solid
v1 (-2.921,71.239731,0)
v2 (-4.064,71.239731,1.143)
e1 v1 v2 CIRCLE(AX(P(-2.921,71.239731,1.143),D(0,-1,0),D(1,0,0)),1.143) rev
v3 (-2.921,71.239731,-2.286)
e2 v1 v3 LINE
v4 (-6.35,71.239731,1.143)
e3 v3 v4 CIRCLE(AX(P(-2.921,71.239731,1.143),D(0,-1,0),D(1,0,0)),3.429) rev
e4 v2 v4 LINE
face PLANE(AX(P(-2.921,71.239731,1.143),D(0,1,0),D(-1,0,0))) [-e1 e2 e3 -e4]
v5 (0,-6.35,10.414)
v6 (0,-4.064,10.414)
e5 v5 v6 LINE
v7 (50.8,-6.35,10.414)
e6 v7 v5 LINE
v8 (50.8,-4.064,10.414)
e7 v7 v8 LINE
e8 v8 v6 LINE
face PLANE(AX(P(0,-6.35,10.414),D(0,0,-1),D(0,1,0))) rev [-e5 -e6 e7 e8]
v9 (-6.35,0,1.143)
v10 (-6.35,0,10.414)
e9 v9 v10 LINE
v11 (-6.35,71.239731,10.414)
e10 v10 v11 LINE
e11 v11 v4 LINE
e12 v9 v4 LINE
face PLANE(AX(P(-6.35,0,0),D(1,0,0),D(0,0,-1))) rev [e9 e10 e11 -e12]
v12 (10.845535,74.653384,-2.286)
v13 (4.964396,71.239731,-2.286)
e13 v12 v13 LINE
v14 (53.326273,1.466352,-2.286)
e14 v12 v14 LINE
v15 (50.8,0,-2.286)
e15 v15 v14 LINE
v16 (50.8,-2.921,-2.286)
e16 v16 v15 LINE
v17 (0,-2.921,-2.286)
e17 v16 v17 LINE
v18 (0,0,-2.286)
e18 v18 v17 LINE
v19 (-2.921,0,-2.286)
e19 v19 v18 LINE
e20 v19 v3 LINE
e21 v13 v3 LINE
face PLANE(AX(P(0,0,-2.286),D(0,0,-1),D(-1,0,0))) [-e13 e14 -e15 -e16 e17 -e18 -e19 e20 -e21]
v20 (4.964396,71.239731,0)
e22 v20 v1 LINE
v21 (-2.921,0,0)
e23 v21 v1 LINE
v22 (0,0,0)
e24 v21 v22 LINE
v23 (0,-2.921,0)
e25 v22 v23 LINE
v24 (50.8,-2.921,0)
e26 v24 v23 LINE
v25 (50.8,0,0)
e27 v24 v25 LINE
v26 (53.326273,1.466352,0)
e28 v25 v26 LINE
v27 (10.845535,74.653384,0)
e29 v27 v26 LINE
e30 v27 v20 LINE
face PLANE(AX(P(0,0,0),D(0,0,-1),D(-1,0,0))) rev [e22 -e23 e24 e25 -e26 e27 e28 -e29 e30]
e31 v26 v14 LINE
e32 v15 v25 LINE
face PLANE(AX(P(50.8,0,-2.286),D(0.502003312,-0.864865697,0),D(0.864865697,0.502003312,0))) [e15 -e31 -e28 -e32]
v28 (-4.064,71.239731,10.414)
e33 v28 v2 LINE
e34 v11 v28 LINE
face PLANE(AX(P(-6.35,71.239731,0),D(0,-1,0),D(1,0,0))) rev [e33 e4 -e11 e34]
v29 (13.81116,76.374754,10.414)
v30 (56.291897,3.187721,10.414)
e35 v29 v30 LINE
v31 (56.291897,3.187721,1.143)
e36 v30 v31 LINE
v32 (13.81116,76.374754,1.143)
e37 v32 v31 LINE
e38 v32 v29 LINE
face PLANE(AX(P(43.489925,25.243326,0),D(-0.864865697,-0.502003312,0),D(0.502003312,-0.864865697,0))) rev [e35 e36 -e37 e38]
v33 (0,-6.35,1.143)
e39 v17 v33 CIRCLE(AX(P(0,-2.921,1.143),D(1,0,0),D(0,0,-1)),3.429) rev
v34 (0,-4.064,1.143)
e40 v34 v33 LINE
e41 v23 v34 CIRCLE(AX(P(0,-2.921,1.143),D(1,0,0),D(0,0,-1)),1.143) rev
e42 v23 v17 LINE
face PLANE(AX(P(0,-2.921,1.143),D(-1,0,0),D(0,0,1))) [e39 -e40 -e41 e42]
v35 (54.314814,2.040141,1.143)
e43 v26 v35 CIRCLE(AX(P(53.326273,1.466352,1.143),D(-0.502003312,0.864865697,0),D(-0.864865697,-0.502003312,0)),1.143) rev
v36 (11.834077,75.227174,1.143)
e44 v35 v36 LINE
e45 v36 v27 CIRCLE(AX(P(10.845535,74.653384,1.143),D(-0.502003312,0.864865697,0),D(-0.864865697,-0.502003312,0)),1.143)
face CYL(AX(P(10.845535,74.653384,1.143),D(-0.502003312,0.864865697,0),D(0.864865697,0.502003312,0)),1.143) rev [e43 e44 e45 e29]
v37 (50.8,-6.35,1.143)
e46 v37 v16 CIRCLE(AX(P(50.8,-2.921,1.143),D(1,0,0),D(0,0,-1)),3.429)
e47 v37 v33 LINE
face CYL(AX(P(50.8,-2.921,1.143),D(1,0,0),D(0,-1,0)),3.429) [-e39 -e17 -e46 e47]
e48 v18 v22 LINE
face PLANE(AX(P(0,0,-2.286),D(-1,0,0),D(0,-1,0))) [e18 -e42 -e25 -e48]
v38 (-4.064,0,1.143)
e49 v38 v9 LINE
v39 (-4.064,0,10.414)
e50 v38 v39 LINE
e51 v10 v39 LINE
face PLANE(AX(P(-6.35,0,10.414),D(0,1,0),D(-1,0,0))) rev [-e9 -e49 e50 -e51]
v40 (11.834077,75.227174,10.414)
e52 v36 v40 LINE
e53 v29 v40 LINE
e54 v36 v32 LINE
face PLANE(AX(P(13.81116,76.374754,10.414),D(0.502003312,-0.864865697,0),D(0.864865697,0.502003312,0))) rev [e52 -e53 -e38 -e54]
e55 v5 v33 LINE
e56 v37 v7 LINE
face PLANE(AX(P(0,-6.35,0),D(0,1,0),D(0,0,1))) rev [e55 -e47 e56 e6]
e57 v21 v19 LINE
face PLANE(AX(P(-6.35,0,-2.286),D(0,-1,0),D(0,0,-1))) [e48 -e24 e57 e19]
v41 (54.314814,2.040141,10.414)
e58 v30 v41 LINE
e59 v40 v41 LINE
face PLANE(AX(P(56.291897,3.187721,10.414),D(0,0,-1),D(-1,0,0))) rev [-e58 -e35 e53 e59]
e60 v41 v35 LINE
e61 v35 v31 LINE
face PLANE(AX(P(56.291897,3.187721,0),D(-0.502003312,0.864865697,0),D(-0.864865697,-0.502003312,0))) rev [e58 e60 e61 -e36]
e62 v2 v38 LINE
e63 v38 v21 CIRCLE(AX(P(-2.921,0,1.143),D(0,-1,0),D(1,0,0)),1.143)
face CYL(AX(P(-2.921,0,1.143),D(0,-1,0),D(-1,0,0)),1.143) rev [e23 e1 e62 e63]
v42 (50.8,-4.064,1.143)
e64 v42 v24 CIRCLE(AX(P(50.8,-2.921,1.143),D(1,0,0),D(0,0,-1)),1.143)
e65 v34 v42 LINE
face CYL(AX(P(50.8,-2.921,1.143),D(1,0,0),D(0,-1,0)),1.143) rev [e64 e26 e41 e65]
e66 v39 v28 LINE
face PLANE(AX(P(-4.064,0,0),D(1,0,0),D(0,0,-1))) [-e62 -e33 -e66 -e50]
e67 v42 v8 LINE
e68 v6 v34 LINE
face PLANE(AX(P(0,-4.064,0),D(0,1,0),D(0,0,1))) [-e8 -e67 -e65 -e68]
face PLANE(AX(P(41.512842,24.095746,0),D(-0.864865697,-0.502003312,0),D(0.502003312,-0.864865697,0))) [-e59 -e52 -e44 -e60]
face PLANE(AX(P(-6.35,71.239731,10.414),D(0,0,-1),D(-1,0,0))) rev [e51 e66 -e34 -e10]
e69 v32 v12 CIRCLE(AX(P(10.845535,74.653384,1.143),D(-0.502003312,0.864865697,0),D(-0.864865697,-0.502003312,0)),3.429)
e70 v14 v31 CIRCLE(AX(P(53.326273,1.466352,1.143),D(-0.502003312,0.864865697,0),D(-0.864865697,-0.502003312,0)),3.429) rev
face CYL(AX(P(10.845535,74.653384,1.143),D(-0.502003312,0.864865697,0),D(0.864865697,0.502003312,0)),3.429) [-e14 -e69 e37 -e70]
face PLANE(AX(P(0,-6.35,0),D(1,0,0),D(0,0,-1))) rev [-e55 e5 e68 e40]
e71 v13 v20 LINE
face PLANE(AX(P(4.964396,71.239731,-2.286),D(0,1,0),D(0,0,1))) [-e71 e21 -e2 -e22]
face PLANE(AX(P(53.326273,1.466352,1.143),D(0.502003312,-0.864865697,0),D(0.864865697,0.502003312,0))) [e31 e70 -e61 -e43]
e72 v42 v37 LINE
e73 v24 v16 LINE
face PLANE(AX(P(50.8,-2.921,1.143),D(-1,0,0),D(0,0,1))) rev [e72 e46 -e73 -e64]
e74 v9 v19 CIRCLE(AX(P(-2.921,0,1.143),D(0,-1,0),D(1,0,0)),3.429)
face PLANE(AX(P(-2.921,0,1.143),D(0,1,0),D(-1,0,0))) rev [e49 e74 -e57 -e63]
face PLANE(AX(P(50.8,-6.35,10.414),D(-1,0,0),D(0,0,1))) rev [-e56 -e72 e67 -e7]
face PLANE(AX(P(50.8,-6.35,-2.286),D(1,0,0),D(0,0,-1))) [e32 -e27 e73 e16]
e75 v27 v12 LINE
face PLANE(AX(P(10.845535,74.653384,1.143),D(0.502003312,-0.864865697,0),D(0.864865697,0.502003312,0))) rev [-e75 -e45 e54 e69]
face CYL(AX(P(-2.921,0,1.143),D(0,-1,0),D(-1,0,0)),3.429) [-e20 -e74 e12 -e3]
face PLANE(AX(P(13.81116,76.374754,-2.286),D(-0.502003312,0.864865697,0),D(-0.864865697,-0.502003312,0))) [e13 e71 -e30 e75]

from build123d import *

# Parameters (mm, degrees)
BASE_FLANGE1_DEPTH             = 2.286
EDGE_FLANGE1_STRIP_W           = 11.43
EDGE_FLANGE1_STRIP_H           = 2.286
EDGE_FLANGE1_STRIP_CUT_DEPTH   = 71.239731207
EDGE_FLANGE1_STRIP_2_W         = 11.43
EDGE_FLANGE1_STRIP_2_H         = 2.286
EDGE_FLANGE1_STRIP_CUT_2_DEPTH = 50.8
EDGE_FLANGE1_STRIP_3_W         = 11.43
EDGE_FLANGE1_STRIP_3_H         = 2.286
EDGE_FLANGE1_STRIP_CUT_3_DEPTH = 84.622425054
EDGE_FLANGE1_DEPTH             = 71.239731207
EDGE_FLANGE1_BEND_DEPTH        = 50.8
EDGE_FLANGE1_BEND_2_DEPTH      = 84.622425054


# Sheet-metal steps are written as plain solids
with BuildPart() as part:
    # Sketch1 → Base-Flange1 (new body)
    with BuildSketch(Plane.XY):
        Polygon((0, 0), (0, -6.35), (50.8, -6.35), (50.8, 0), (56.291897179, 3.187721032), (13.811159523, 76.374753696), (4.964395568, 71.239731207), (-6.35, 71.239731207), (-6.35, 0), align=None)
    extrude(amount=-BASE_FLANGE1_DEPTH)

    # Edge-Flange1 strip (across the edge) → Edge-Flange1 strip cut (cut)
    with BuildSketch(Plane(origin=(-6.35, 71.239731207, 0), x_dir=(1, 0, 0), z_dir=(0, -1, 0))):
        with Locations((-2.286, -1.143)):
            Rectangle(EDGE_FLANGE1_STRIP_W, EDGE_FLANGE1_STRIP_H)
    extrude(amount=EDGE_FLANGE1_STRIP_CUT_DEPTH, mode=Mode.SUBTRACT)

    # Edge-Flange1 strip 2 (across the edge) → Edge-Flange1 strip cut 2 (cut)
    with BuildSketch(Plane(origin=(0, -6.35, 0), x_dir=(0, 1, 0), z_dir=(1, 0, 0))):
        with Locations((-2.286, -1.143)):
            Rectangle(EDGE_FLANGE1_STRIP_2_W, EDGE_FLANGE1_STRIP_2_H)
    extrude(amount=EDGE_FLANGE1_STRIP_CUT_2_DEPTH, mode=Mode.SUBTRACT)

    # Edge-Flange1 strip 3 (across the edge) → Edge-Flange1 strip cut 3 (cut)
    with BuildSketch(Plane(origin=(56.291897179, 3.187721032, 0), x_dir=(-0.8648656974537777, -0.5020033121083872, 3.491481338843133e-15), z_dir=(-0.5020033121083872, 0.8648656974537777, 0))):
        with Locations((-2.286, -1.143)):
            Rectangle(EDGE_FLANGE1_STRIP_3_W, EDGE_FLANGE1_STRIP_3_H)
    extrude(amount=EDGE_FLANGE1_STRIP_CUT_3_DEPTH, mode=Mode.SUBTRACT)

    # Edge-Flange1 section (across the edge) → Edge-Flange1 (add)
    with BuildSketch(Plane(origin=(-6.35, 71.239731207, 0), x_dir=(1, 0, 0), z_dir=(0, -1, 0))):
        with BuildLine():
            Line((0, 1.143), (0, 10.414))
            Line((0, 10.414), (2.286, 10.414))
            Line((2.286, 10.414), (2.286, 1.143))
            ThreePointArc((2.286, 1.143), (2.620776949, 0.334776949), (3.429, 0))
            Line((3.429, 0), (3.429, -2.286))
            ThreePointArc((3.429, -2.286), (1.004330847, -1.281669153), (0, 1.143))
        make_face()
    extrude(amount=EDGE_FLANGE1_DEPTH)

    # Edge-Flange1 section 2 (across the edge) → Edge-Flange1 bend (add)
    with BuildSketch(Plane(origin=(0, -6.35, 0), x_dir=(0, 1, 0), z_dir=(1, 0, 0))):
        with BuildLine():
            Line((0, 1.143), (0, 10.414))
            Line((0, 10.414), (2.286, 10.414))
            Line((2.286, 10.414), (2.286, 1.143))
            ThreePointArc((2.286, 1.143), (2.620776949, 0.334776949), (3.429, 0))
            Line((3.429, 0), (3.429, -2.286))
            ThreePointArc((3.429, -2.286), (1.004330847, -1.281669153), (0, 1.143))
        make_face()
    extrude(amount=EDGE_FLANGE1_BEND_DEPTH)

    # Edge-Flange1 section 3 (across the edge) → Edge-Flange1 bend 2 (add)
    with BuildSketch(Plane(origin=(56.291897179, 3.187721032, 0), x_dir=(-0.8648656974537777, -0.5020033121083872, 3.491481338843133e-15), z_dir=(-0.5020033121083872, 0.8648656974537777, 0))):
        with BuildLine():
            Line((0, 1.143), (0, 10.414))
            Line((0, 10.414), (2.286, 10.414))
            Line((2.286, 10.414), (2.286, 1.143))
            ThreePointArc((2.286, 1.143), (2.620776949, 0.334776949), (3.429, 0))
            Line((3.429, 0), (3.429, -2.286))
            ThreePointArc((3.429, -2.286), (1.004330847, -1.281669153), (0, 1.143))
        make_face()
    extrude(amount=EDGE_FLANGE1_BEND_2_DEPTH)


solid = part.part
